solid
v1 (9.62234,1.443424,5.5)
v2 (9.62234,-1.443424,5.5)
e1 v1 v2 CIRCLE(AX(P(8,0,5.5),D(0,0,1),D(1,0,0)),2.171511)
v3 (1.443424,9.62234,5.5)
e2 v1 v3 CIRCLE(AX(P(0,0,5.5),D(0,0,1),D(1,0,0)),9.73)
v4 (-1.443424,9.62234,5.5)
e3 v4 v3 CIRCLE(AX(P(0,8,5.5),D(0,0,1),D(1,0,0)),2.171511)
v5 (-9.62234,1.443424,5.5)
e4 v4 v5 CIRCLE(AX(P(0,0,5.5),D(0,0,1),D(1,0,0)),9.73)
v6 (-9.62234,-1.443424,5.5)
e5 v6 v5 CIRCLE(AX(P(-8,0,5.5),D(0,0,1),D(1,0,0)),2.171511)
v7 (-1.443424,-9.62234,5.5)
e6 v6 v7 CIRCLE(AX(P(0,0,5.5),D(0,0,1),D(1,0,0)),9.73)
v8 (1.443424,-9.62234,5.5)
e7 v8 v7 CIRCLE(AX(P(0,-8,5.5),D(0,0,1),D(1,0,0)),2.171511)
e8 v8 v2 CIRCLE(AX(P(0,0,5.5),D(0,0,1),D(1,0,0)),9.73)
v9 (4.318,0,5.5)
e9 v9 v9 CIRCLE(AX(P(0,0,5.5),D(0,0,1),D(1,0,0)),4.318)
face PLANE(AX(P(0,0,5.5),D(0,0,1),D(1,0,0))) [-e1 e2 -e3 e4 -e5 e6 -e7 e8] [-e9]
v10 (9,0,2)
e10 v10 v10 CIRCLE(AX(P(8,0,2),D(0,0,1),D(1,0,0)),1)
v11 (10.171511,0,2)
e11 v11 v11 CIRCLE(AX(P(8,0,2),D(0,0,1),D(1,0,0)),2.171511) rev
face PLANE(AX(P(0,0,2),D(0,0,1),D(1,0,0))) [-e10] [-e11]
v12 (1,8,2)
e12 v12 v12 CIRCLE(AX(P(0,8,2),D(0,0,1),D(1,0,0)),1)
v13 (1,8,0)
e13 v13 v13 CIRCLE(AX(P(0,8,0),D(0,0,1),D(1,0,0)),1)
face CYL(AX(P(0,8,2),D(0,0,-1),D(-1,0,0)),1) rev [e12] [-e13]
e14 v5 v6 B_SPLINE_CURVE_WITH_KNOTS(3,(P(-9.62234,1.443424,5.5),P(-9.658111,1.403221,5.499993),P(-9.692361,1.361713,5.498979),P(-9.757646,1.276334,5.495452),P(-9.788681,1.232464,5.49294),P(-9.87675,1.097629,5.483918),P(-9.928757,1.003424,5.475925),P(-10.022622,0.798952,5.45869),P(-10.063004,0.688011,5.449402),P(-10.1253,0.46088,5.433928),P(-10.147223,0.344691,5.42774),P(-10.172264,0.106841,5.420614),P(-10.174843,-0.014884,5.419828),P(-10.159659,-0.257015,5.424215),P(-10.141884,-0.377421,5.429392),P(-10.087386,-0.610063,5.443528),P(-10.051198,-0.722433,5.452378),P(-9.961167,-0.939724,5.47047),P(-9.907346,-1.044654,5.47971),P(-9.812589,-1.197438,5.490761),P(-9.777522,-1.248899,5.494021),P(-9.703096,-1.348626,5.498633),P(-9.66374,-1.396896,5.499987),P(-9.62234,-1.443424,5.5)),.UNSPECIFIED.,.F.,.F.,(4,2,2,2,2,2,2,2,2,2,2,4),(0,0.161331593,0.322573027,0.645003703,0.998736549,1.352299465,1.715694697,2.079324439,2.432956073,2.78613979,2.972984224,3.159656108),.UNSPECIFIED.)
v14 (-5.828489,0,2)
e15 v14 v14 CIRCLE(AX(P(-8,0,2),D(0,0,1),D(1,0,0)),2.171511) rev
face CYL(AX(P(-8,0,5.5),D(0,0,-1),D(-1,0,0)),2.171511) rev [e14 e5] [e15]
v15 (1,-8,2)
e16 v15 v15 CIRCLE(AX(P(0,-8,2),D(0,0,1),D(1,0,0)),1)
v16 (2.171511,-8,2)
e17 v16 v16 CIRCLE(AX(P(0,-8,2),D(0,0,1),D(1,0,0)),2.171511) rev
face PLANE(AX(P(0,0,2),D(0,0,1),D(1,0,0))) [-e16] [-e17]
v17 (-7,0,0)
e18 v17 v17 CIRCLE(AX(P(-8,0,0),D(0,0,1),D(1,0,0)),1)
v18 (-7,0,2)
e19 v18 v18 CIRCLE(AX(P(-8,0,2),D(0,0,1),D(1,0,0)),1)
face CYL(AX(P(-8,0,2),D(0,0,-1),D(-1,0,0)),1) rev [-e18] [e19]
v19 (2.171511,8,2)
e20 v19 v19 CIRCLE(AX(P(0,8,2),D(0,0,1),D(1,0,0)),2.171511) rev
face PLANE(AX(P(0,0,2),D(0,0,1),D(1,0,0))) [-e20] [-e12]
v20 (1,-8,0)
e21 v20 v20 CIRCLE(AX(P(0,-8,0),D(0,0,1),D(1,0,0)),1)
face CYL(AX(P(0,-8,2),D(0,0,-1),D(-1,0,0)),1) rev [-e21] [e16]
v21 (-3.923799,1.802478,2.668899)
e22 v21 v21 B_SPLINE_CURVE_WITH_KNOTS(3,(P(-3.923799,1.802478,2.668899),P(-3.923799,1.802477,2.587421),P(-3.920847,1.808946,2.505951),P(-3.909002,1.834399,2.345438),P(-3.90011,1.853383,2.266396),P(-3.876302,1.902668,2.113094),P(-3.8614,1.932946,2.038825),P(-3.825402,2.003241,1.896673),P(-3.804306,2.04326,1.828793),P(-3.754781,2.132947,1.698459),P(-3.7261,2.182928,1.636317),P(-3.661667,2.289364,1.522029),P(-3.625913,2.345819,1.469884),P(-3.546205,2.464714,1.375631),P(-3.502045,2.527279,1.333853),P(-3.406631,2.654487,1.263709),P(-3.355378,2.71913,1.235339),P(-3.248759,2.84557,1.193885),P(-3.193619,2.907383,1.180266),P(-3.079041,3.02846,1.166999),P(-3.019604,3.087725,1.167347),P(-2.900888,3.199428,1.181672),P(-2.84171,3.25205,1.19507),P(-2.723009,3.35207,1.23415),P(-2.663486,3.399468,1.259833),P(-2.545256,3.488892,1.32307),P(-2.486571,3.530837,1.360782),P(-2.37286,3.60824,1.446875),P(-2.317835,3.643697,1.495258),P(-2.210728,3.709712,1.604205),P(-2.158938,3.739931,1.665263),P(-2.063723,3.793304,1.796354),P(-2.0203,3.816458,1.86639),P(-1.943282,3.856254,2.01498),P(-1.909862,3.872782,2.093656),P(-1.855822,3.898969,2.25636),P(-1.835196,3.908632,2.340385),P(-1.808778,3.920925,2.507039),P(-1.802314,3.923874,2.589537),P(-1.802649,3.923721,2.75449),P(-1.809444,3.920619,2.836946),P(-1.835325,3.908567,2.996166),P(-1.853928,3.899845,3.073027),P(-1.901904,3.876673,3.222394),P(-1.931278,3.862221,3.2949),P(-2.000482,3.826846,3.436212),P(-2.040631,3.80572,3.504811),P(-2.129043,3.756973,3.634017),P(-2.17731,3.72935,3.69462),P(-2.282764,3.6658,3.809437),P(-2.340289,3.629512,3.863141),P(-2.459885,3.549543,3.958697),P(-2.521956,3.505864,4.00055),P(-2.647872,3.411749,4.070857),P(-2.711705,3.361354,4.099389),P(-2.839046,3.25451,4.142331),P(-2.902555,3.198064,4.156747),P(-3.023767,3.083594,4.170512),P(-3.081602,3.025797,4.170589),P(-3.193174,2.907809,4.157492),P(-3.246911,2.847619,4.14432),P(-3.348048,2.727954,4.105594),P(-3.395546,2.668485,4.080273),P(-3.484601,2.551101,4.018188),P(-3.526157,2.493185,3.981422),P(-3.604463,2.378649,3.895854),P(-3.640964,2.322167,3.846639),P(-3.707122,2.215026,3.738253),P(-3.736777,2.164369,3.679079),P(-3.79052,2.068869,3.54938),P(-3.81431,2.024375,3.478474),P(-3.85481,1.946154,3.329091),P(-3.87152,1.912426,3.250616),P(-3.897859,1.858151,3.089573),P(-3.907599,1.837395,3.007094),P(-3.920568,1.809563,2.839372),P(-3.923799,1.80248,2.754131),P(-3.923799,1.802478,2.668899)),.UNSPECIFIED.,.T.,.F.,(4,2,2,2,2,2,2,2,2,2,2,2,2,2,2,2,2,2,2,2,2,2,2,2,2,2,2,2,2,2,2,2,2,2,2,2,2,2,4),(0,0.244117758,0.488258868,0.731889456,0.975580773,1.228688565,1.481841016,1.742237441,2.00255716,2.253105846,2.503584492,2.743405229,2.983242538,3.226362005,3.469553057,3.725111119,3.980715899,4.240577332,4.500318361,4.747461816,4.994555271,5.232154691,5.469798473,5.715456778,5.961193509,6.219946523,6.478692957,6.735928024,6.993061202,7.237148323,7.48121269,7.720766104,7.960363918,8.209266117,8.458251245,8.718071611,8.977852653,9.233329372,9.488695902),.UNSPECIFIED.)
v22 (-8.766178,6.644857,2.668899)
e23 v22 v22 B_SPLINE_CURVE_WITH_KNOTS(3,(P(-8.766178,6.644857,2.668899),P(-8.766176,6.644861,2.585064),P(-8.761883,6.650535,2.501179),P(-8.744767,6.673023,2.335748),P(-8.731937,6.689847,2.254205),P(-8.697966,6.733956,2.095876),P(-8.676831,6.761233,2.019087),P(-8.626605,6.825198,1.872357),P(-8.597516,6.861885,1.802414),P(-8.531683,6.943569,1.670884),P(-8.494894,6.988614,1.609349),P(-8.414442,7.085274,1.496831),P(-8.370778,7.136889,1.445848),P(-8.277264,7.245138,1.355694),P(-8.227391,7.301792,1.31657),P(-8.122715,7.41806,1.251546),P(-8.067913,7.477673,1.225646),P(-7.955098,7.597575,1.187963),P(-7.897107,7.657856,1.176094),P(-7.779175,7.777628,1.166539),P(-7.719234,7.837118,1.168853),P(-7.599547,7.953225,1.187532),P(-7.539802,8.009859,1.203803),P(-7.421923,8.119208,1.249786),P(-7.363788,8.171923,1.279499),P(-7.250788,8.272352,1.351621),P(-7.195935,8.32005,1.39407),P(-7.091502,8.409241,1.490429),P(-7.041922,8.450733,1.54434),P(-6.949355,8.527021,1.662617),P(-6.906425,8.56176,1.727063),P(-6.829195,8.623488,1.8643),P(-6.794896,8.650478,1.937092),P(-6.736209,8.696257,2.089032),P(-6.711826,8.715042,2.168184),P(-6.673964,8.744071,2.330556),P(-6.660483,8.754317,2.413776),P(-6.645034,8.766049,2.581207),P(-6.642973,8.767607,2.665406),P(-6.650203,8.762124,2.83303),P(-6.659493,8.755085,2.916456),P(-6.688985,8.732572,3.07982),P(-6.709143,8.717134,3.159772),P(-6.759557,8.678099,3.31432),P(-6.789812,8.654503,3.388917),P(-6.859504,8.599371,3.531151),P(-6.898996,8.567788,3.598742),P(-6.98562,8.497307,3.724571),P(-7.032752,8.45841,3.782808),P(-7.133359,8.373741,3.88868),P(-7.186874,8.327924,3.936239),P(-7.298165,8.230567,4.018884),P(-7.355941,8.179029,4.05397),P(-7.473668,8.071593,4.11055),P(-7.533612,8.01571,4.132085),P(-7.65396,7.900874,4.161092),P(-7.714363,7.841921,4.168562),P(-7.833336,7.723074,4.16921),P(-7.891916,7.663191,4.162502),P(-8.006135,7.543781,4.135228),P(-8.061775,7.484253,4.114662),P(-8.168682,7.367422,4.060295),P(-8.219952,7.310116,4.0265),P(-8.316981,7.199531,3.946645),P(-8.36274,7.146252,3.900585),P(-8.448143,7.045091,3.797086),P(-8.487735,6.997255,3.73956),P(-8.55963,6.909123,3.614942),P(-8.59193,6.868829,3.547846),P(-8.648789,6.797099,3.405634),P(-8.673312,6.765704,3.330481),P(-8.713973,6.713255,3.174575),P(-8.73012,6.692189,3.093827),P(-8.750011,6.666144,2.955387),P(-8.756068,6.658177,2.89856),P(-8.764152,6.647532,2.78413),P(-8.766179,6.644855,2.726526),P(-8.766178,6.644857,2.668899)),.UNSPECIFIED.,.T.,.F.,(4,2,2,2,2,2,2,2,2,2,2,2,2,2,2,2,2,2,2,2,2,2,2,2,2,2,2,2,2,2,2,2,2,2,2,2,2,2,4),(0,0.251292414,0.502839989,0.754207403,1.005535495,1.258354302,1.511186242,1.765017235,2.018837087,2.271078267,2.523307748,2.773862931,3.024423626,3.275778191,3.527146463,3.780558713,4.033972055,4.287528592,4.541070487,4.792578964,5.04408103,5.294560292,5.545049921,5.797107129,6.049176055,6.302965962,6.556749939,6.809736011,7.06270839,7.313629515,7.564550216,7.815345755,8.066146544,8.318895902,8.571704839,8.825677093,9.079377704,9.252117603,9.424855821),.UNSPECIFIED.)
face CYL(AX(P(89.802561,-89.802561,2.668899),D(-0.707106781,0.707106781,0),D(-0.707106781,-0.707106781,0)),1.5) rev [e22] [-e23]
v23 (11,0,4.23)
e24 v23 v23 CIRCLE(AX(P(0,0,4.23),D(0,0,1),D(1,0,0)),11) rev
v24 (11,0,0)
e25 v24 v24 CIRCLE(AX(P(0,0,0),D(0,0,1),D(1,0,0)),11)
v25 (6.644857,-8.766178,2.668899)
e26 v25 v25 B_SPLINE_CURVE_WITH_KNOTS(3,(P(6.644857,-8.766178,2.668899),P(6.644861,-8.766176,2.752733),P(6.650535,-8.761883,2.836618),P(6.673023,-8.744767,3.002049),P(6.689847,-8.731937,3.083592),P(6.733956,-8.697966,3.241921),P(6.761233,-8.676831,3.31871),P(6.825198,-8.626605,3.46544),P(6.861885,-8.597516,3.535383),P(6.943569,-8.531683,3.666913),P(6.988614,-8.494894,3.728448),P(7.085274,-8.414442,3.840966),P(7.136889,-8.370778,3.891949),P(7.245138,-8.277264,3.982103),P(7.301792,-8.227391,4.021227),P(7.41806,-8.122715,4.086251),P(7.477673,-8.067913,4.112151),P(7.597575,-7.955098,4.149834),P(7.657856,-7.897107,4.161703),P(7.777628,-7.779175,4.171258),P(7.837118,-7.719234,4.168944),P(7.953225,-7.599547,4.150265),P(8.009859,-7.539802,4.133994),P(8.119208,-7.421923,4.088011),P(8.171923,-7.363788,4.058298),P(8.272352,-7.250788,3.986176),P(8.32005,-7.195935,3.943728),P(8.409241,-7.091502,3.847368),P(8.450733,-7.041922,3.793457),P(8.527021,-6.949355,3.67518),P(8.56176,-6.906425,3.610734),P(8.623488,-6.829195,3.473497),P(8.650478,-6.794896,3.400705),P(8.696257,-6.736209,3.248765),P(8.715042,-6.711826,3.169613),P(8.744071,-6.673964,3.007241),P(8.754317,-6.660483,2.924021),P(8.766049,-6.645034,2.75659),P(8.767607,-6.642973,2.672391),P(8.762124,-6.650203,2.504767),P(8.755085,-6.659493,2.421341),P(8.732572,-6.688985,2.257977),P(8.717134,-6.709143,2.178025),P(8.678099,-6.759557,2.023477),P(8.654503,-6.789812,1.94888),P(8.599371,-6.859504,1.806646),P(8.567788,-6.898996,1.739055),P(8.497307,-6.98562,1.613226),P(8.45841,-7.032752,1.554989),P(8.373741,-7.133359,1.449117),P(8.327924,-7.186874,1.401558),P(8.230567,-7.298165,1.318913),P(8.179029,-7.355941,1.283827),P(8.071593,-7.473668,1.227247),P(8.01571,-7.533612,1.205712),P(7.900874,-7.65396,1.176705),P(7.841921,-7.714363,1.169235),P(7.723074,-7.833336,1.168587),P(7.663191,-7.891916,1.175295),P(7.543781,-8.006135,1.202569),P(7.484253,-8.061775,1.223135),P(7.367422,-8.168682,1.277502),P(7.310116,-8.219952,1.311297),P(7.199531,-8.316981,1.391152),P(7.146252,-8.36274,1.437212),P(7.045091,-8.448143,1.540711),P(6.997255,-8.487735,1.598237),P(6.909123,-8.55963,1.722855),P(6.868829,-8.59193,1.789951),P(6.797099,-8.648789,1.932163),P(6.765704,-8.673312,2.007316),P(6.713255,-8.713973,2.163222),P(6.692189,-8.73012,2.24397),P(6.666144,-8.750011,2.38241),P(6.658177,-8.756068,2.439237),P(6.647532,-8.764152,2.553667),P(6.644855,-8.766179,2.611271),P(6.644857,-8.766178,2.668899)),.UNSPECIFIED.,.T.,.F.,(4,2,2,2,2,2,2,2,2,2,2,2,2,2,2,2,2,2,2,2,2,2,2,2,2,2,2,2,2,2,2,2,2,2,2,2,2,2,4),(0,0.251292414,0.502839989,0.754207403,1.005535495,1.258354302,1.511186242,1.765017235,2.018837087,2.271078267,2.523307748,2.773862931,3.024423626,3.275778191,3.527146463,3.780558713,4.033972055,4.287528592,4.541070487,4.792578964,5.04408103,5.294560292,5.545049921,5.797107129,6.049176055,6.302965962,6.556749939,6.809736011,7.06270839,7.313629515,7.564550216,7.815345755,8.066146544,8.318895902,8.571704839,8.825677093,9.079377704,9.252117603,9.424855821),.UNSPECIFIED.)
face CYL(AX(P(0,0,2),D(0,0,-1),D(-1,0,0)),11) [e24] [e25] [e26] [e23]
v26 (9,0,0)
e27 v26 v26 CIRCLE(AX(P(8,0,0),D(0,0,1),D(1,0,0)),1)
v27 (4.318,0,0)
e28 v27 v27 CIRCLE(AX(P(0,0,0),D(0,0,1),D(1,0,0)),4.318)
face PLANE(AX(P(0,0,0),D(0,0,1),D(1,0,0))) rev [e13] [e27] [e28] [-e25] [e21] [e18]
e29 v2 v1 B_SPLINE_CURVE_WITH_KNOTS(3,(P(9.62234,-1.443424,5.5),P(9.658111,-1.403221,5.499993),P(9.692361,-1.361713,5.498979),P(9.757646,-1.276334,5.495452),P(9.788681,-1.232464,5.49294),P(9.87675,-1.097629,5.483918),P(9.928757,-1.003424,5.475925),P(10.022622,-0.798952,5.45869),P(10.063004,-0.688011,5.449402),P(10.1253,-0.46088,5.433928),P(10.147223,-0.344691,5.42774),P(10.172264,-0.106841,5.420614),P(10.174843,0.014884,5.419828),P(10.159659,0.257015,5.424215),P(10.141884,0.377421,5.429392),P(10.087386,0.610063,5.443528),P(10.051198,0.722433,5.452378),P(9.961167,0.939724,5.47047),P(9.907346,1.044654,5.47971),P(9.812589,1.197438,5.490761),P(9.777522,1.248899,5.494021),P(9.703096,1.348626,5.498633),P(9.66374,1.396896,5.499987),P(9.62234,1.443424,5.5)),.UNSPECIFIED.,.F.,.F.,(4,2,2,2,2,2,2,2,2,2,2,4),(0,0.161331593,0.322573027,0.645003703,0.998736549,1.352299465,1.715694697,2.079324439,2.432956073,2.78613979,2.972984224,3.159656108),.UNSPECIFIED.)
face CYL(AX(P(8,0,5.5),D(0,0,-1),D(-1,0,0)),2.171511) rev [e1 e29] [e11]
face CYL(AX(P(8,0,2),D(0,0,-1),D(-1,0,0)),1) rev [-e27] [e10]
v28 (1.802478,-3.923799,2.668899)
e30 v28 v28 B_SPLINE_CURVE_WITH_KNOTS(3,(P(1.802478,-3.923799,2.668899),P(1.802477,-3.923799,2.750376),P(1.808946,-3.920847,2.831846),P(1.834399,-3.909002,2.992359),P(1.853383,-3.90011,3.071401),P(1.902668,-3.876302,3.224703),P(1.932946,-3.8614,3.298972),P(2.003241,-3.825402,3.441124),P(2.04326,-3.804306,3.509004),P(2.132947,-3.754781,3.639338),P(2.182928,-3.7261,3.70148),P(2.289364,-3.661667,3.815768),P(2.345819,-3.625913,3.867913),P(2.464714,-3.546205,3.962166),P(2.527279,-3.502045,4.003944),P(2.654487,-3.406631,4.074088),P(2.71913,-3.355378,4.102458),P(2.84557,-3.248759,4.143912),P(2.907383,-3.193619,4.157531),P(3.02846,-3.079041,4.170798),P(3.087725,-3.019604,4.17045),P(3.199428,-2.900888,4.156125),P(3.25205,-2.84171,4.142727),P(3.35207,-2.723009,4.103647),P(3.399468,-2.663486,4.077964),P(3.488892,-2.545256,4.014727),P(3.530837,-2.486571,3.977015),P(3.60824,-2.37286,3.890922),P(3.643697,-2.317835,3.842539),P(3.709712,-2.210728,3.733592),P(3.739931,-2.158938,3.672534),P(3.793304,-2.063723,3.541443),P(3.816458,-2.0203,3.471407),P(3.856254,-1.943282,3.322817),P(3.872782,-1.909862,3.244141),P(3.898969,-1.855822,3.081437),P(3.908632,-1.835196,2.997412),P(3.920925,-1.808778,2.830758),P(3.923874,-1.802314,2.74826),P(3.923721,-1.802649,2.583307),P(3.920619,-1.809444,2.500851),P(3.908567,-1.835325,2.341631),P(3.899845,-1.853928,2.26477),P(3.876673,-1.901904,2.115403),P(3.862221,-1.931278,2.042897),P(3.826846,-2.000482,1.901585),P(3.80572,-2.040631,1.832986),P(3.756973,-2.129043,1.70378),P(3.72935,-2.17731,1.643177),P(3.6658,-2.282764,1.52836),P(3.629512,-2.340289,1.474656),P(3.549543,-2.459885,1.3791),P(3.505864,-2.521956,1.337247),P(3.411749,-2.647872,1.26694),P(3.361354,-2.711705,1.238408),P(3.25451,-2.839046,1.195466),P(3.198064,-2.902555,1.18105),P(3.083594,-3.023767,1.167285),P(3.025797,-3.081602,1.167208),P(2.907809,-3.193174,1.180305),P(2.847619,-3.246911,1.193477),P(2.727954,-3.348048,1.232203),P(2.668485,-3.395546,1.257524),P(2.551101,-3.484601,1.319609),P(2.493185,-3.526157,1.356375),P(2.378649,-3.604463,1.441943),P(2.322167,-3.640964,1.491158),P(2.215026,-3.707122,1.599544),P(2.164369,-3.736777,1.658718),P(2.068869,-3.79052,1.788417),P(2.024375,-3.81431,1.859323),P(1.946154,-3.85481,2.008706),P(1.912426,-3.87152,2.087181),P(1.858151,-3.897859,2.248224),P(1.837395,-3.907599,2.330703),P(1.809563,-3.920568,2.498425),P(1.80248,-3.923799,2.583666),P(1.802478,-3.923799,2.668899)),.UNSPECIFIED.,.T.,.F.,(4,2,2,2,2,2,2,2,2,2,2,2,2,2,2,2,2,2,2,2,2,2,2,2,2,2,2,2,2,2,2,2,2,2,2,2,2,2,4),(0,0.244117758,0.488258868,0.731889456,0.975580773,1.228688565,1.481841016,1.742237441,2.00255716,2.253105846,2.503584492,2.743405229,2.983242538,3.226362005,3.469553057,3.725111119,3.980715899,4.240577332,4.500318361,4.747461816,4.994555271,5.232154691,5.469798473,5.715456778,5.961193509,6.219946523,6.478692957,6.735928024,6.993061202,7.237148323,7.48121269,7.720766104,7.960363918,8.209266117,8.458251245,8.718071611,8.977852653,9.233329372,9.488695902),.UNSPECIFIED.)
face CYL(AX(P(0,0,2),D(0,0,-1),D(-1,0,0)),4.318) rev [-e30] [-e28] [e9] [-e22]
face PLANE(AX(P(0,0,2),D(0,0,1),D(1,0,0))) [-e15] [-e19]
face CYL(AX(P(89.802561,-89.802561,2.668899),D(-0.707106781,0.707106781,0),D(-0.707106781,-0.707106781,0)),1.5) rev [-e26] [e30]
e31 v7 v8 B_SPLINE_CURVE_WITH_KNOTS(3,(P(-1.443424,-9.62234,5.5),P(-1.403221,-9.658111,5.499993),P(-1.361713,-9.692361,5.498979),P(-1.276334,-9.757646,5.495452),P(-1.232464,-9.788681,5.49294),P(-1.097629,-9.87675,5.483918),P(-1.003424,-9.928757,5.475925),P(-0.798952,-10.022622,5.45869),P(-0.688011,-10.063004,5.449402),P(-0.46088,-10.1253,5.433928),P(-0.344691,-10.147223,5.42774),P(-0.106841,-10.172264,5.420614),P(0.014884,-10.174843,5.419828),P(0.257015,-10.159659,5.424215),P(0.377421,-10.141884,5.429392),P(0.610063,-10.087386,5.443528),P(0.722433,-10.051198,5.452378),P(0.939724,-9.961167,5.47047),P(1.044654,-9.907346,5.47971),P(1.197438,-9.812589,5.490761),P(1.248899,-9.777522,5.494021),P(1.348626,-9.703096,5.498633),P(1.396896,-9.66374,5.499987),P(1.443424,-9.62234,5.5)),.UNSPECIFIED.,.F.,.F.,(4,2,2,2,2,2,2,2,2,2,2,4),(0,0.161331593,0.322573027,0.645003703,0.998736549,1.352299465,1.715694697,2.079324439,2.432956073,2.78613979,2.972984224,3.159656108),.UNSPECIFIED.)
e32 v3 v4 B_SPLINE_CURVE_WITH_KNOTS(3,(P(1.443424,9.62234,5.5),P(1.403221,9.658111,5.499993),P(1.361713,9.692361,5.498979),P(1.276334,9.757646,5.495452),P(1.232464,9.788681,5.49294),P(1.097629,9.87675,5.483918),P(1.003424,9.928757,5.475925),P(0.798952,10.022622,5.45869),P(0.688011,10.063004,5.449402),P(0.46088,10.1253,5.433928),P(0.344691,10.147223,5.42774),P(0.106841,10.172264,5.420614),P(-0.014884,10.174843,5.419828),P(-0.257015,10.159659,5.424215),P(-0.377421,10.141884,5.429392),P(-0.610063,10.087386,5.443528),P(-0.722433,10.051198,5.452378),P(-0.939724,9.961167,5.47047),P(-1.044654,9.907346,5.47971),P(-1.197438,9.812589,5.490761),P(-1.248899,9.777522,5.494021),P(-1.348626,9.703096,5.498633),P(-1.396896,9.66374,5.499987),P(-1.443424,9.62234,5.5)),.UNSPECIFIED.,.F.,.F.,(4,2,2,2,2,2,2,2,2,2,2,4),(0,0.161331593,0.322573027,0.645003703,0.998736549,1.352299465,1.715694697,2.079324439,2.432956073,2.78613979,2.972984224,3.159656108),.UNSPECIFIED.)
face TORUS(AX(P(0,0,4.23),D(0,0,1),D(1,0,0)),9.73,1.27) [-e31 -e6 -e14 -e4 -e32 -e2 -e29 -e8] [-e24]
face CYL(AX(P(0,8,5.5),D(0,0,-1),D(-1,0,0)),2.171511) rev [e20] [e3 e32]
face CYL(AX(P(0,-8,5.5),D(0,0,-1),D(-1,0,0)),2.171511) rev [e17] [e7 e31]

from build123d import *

# Parameters (mm, degrees)
SKETCH2_R           = 11
SKETCH2_R_2         = 4.318
SKETCH2_R_3         = 1
BOSS_EXTRUDE1_DEPTH = 2
SKETCH3_R           = 11
SKETCH3_R_2         = 4.318
SKETCH3_R_3         = 2.171511002
BOSS_EXTRUDE2_DEPTH = 3.5
SKETCH5_R           = 1.5
CUT_EXTRUDE1_DEPTH  = 127
FILLET1_R           = 1.27


with BuildPart() as part:
    # Sketch2 → Boss-Extrude1 (new body)
    with BuildSketch(Plane.XY):
        Circle(SKETCH2_R)
        Circle(SKETCH2_R_2, mode=Mode.SUBTRACT)
        with Locations((0, 8)):
            Circle(SKETCH2_R_3, mode=Mode.SUBTRACT)
        with Locations((8, 0)):
            Circle(SKETCH2_R_3, mode=Mode.SUBTRACT)
        with Locations((0, -8)):
            Circle(SKETCH2_R_3, mode=Mode.SUBTRACT)
        with Locations((-8, 0)):
            Circle(SKETCH2_R_3, mode=Mode.SUBTRACT)
    extrude(amount=BOSS_EXTRUDE1_DEPTH)

    # Sketch3 → Boss-Extrude2 (add)
    with BuildSketch(Plane.XY.offset(2)):
        Circle(SKETCH3_R)
        Circle(SKETCH3_R_2, mode=Mode.SUBTRACT)
        with Locations((0, 8)):
            Circle(SKETCH3_R_3, mode=Mode.SUBTRACT)
        with Locations((8, 0)):
            Circle(SKETCH3_R_3, mode=Mode.SUBTRACT)
        with Locations((0, -8)):
            Circle(SKETCH3_R_3, mode=Mode.SUBTRACT)
        with Locations((-8, 0)):
            Circle(SKETCH3_R_3, mode=Mode.SUBTRACT)
    extrude(amount=BOSS_EXTRUDE2_DEPTH)

    # Sketch5 → Cut-Extrude1 (cut, symmetric)
    with BuildSketch(Plane(origin=(0, 0, 0), x_dir=(0.7071067811865477, 0.7071067811865475, 0), z_dir=(-0.7071067811865475, 0.7071067811865477, 0))):
        with Locations(Location((0, -2.668898501, 0), (0, 0, 180))):
            Circle(SKETCH5_R)
    extrude(amount=CUT_EXTRUDE1_DEPTH, both=True, mode=Mode.SUBTRACT)

    # Fillet1
    # the kernel refuses this fillet: 1.27 mm, written as the material it takes off along each edge
    with BuildSketch(Plane(origin=(0, 0, 5.5), x_dir=(1, 0, 0), z_dir=(0, -1, 0))) as fillet1_piece_1:
        with BuildLine():
            CenterArc((11 - FILLET1_R, -FILLET1_R), FILLET1_R, 0, 90)
            Line((11 - FILLET1_R, 0), (11, 0))
            Line((11, 0), (11, -FILLET1_R))
        make_face()
    revolve(axis=Axis((0, 0, 5.5), (0, 0, 1)), mode=Mode.SUBTRACT)


solid = part.part
